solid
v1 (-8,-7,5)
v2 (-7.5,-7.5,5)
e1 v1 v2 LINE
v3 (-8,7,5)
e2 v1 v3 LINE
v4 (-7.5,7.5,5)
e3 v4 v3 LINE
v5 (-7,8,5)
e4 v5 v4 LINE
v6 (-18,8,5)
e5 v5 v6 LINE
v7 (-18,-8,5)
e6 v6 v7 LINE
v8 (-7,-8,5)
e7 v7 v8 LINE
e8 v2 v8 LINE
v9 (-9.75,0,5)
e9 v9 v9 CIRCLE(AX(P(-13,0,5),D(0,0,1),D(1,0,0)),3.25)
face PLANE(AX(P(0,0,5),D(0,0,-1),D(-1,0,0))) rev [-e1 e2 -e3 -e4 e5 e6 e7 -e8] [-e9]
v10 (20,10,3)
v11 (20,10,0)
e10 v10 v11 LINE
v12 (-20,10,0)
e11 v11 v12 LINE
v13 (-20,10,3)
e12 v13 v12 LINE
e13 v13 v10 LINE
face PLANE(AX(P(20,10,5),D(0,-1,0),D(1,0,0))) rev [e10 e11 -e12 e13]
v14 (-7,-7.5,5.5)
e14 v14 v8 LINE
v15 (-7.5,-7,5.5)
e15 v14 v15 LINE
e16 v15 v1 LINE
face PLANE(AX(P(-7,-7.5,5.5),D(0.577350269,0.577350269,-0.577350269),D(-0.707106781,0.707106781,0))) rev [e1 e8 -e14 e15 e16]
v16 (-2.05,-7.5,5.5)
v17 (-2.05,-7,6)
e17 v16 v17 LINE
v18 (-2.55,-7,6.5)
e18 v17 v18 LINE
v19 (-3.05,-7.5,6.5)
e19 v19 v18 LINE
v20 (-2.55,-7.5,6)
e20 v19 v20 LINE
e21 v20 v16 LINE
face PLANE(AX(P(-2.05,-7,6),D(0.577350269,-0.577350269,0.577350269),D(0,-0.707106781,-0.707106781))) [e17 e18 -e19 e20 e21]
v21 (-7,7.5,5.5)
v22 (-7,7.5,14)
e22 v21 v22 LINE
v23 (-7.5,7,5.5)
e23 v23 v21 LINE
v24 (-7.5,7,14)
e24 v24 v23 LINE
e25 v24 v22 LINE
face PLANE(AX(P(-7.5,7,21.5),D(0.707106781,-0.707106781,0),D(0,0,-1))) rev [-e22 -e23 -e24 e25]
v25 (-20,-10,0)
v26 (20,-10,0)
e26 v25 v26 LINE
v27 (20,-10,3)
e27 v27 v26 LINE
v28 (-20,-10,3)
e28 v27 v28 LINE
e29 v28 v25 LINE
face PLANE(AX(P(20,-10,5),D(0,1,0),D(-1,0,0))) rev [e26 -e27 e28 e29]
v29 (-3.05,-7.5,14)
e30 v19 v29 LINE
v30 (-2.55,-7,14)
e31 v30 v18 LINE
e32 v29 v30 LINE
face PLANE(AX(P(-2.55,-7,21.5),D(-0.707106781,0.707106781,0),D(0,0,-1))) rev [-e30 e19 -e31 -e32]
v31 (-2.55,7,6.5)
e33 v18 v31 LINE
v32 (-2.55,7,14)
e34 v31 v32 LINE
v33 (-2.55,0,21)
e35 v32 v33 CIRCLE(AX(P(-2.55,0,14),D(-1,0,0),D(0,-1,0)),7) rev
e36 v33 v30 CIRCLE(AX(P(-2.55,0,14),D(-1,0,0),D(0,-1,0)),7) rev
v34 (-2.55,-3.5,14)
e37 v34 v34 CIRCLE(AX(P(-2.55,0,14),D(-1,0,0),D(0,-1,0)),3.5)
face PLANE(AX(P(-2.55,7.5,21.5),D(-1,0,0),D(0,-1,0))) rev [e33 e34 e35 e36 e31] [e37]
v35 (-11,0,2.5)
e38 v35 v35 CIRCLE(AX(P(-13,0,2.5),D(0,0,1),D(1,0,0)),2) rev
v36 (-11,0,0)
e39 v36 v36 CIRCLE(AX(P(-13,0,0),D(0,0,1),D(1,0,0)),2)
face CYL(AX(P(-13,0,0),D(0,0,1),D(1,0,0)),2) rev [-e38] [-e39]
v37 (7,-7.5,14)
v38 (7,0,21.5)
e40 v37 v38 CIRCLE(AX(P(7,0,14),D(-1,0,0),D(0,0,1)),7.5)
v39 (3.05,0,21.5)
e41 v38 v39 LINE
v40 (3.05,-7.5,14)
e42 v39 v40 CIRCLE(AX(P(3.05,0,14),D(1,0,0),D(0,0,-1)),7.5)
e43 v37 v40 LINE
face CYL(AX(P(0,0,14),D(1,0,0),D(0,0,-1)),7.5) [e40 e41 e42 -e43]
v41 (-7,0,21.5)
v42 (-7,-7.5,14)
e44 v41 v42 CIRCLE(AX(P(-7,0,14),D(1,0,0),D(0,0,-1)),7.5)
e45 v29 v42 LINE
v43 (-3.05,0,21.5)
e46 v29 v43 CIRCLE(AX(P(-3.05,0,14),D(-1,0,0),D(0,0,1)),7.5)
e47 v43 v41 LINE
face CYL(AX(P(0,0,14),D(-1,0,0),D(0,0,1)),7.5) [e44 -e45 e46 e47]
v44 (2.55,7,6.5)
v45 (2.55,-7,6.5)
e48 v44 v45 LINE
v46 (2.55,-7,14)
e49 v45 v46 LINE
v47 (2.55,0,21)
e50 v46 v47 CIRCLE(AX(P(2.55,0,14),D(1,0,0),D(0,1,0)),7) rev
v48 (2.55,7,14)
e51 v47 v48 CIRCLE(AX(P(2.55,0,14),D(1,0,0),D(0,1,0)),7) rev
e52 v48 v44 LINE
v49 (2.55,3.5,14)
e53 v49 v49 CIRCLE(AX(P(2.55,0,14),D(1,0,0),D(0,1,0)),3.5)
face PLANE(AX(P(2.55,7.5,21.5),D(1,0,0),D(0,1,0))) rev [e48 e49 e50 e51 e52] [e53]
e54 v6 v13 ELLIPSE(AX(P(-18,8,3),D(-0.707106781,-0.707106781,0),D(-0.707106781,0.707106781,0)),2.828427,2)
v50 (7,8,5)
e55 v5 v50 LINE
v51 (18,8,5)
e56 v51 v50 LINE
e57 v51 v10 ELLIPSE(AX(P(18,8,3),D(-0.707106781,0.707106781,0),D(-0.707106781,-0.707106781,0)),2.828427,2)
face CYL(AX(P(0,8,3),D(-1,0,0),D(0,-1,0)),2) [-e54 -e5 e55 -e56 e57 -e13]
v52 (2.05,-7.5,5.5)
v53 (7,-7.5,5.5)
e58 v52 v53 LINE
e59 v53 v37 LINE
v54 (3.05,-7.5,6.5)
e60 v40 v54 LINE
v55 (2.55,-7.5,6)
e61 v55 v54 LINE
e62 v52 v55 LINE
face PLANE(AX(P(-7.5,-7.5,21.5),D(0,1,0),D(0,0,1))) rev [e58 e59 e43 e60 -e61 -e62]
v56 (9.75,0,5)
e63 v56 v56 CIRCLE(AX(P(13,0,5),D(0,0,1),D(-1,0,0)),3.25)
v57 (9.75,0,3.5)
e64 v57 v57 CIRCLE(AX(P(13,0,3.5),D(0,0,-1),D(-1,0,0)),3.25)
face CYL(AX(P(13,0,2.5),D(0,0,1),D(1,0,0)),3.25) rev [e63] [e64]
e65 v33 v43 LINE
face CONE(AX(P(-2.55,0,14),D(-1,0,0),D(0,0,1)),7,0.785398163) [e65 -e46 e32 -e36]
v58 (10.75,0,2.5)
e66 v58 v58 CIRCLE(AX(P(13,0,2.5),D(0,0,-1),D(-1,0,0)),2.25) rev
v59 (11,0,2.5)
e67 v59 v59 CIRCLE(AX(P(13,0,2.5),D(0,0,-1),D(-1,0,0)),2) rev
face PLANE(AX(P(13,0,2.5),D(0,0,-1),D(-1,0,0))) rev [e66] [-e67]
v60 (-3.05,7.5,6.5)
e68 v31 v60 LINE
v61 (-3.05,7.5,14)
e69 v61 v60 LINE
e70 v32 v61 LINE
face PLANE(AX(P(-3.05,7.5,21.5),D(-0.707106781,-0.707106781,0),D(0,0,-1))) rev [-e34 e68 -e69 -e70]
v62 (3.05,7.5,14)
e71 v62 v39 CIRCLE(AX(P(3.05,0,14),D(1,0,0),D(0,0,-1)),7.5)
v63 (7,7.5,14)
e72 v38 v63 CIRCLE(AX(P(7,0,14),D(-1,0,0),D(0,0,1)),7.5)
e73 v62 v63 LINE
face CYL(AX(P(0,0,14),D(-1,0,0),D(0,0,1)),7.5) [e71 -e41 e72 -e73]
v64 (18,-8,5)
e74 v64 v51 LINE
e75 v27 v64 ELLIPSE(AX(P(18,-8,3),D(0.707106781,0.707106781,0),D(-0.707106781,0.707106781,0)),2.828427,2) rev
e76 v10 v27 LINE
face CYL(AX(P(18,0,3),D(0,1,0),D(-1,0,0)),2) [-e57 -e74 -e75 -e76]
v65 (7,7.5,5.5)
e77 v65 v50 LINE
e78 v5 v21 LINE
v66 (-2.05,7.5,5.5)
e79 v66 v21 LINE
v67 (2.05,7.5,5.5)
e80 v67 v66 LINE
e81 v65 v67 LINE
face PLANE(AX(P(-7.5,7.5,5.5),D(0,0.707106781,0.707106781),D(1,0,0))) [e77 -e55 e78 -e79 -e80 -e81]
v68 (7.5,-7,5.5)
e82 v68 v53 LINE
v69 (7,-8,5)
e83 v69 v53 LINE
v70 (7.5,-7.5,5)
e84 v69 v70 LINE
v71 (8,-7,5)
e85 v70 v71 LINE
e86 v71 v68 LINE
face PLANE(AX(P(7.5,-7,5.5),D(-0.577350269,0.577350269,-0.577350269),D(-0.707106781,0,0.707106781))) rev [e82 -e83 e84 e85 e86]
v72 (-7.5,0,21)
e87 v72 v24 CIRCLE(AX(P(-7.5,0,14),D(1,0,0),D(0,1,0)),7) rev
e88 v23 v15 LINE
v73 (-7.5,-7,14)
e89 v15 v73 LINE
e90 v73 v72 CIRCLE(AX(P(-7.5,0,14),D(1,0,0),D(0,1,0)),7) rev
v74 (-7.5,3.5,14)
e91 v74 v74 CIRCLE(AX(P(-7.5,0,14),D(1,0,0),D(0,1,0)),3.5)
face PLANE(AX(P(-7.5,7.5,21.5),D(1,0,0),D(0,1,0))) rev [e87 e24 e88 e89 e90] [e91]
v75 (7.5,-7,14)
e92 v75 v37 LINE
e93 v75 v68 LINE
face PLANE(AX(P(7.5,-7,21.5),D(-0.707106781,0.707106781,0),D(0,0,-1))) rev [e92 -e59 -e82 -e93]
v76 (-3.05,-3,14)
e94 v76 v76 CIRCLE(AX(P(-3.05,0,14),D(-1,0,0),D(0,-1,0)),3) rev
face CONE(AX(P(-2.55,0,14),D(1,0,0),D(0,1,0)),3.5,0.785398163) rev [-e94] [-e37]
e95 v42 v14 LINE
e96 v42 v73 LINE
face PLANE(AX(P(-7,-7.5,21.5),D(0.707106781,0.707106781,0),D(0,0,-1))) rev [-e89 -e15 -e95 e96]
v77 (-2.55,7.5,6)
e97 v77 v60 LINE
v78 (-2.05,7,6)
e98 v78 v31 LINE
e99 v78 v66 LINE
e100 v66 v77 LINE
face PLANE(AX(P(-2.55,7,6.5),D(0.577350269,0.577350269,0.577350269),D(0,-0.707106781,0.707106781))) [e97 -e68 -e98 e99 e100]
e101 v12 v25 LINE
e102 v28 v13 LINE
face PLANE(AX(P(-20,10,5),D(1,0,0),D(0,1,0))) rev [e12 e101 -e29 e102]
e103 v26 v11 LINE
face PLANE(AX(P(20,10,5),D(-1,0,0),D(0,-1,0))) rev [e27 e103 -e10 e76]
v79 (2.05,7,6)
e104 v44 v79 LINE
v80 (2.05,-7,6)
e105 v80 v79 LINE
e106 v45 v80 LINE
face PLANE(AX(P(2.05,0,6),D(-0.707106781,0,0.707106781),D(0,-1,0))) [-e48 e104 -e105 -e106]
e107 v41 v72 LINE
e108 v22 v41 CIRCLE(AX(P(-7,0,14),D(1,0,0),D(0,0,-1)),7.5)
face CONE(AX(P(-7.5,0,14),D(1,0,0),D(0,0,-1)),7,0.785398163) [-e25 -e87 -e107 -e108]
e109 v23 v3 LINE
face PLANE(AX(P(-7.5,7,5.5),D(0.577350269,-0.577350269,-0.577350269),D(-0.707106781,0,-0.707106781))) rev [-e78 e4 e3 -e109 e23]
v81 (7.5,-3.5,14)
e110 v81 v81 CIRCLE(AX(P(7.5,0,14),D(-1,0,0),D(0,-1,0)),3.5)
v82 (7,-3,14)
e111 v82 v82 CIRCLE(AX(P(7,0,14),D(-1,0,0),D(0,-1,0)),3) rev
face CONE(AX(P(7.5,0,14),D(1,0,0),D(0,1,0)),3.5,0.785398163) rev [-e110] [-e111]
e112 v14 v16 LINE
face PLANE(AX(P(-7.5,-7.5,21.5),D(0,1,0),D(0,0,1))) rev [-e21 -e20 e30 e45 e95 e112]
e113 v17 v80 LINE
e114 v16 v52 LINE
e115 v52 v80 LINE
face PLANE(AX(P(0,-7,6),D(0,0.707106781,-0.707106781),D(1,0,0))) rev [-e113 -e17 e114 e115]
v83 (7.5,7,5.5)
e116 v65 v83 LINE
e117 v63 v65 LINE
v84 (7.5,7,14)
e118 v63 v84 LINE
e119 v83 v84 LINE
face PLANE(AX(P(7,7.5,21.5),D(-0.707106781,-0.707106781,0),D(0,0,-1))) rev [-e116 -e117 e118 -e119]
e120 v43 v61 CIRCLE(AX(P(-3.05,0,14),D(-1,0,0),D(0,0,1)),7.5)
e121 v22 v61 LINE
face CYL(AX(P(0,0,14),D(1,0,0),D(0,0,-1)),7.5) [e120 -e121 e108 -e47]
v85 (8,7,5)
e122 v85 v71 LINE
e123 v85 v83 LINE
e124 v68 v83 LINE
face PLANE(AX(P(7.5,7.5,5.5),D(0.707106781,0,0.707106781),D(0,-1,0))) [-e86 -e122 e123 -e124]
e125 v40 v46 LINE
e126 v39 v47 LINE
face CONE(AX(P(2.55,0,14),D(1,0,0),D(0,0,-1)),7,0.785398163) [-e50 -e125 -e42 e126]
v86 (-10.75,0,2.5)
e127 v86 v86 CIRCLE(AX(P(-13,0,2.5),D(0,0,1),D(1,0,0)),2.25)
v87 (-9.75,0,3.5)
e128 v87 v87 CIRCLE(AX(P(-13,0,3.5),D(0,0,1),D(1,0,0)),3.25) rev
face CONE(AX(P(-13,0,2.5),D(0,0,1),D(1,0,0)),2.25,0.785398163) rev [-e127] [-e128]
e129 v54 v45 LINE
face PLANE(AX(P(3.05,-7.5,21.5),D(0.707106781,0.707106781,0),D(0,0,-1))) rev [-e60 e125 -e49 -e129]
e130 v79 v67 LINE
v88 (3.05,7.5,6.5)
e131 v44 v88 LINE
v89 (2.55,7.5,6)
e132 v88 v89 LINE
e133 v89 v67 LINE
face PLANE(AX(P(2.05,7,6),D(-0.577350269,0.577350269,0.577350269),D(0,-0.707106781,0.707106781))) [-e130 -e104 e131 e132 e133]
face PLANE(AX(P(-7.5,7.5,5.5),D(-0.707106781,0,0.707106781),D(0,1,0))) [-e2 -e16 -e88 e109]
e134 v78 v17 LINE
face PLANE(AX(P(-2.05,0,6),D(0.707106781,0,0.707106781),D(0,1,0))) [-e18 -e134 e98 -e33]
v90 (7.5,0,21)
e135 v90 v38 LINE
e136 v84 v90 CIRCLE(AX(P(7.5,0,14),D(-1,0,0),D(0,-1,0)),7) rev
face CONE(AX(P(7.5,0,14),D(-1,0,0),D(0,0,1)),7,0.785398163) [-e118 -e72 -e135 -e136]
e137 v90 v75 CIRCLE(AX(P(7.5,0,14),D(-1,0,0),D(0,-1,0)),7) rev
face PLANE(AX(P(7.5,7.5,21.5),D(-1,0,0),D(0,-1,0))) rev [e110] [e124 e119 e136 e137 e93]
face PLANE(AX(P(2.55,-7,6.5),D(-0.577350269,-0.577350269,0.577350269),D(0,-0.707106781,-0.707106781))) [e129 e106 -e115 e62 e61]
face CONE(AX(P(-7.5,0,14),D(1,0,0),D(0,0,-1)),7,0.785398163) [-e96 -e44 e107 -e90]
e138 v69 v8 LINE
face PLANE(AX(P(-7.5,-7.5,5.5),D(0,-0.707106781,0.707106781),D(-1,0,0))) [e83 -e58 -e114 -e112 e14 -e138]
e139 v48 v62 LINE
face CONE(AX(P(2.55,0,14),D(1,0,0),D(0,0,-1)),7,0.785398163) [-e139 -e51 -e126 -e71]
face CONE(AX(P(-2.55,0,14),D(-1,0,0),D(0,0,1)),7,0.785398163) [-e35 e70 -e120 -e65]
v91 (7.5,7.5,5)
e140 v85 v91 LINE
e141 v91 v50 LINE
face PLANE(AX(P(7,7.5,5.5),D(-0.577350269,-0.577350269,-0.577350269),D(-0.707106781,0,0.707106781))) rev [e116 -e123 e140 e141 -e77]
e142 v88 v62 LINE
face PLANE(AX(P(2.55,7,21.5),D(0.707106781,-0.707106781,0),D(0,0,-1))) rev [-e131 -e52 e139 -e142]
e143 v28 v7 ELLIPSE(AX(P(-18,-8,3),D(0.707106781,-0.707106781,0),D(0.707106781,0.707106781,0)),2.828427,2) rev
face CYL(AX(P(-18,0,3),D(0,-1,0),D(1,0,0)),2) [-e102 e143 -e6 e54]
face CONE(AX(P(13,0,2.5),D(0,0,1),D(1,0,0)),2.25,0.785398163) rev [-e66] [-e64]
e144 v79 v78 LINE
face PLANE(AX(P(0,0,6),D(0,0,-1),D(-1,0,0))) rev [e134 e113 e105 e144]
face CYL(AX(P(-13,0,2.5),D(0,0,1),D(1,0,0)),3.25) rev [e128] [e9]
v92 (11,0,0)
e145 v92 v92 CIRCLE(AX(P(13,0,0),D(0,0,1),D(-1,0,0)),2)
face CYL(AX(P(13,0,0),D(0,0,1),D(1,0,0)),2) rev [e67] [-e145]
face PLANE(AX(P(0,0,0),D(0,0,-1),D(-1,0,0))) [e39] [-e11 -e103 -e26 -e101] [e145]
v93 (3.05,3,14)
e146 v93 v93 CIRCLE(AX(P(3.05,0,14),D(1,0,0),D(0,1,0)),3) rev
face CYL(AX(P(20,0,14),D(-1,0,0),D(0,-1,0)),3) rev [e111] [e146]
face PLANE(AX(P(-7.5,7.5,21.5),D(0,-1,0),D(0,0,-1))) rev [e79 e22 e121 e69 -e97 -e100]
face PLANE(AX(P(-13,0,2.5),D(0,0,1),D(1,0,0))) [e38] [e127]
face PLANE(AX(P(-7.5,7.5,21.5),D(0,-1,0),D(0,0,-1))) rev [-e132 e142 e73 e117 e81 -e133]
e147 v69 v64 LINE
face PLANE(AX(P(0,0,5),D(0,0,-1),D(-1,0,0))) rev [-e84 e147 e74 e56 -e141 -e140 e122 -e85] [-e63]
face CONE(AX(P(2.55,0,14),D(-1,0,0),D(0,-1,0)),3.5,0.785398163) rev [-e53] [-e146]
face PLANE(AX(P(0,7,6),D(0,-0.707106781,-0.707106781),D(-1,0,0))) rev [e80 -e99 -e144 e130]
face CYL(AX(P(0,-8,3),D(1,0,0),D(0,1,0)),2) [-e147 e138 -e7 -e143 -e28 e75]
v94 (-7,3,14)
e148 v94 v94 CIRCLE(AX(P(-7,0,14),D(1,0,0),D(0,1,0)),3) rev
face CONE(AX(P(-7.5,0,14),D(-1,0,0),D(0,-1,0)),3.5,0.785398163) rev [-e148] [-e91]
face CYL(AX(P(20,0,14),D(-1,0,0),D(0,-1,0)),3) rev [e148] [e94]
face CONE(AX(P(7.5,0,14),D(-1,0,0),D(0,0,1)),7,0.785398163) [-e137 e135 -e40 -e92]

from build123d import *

# Parameters (mm, degrees)
SKETCH1_W               = 40
SKETCH1_H               = 20
BOSS_EXTRUDE1_DEPTH     = 5
SKETCH2_W               = 4.95
SKETCH2_H               = 15
BOSS_EXTRUDE2_DEPTH     = 16.5
CUT_EXTRUDE1_DEPTH      = 37.311155311
CUT_EXTRUDE1_DEPTH_BACK = 37.311155311
SKETCH3_R               = 3
FILLET1_R               = 7.5
SKETCH4_W               = 5.1
SKETCH4_H               = 15
BOSS_EXTRUDE3_DEPTH     = 1
CHAMFER1_SIZE           = 0.5
FILLET2_R               = 2
CUT_EXTRUDE2_DEPTH      = 28.789386463
CUT_EXTRUDE2_DEPTH_BACK = 28.789386463
SKETCH5_R               = 2
SKETCH7_R               = 3.25
CUT_EXTRUDE3_DEPTH      = 2.5
CHAMFER2_SIZE           = 1


with BuildPart() as part:
    # Sketch1 → Boss-Extrude1 (new body)
    with BuildSketch(Plane.XY):
        Rectangle(SKETCH1_W, SKETCH1_H)
    extrude(amount=BOSS_EXTRUDE1_DEPTH)

    # Sketch2 → Boss-Extrude2 (add)
    with BuildSketch(Plane.XY.offset(5)):
        with Locations((-5.025, 0)):
            Rectangle(SKETCH2_W, SKETCH2_H)
        with Locations((5.025, 0)):
            Rectangle(SKETCH2_W, SKETCH2_H)
    extrude(amount=BOSS_EXTRUDE2_DEPTH)

    # Sketch3 → Cut-Extrude1 (cut, two sides: drawn at the far end of the back side and taken through both)
    with BuildSketch(Plane.ZY.offset(7.5).offset(-CUT_EXTRUDE1_DEPTH_BACK)):
        with Locations(Location((14, 0, 0), (0, 0, 270))):
            Circle(SKETCH3_R)
    extrude(amount=CUT_EXTRUDE1_DEPTH + CUT_EXTRUDE1_DEPTH_BACK, mode=Mode.SUBTRACT)

    # Fillet1
    fillet1_edges = [part.edges().sort_by_distance(p)[0] for p in [
        (5.025, -7.5, 21.5),
        (5.025, 7.5, 21.5),
        (-5.025, -7.5, 21.5),
        (-5.025, 7.5, 21.5),
    ]]
    fillet(fillet1_edges, radius=FILLET1_R - 0.0001)  # a hair under: the kernel refuses the full size

    # Sketch4 → Boss-Extrude3 (add)
    with BuildSketch(Plane.XY.offset(5)):
        Rectangle(SKETCH4_W, SKETCH4_H)
    extrude(amount=BOSS_EXTRUDE3_DEPTH)

    # Chamfer1
    chamfer1_edges = [part.edges().sort_by_distance(p)[0] for p in [
        (0, 7.5, 5),
        (-7.5, 0, 5),
        (0, -7.5, 5),
        (7.5, 0, 5),
        (-7.5, 3, 14),
        (-2.55, 3, 14),
        (2.55, 3, 14),
        (7.5, 3, 14),
        (7.5, 7.5, 9.50005),
        (7.5, -7.5, 9.50005),
        (7.5, 5.303330148, 19.303330148),
        (7.5, -5.303330148, 19.303330148),
        (2.55, -7.5, 10.00005),
        (2.55, 7.5, 10.00005),
        (2.55, 5.303330148, 19.303330148),
        (2.55, -5.303330148, 19.303330148),
        (-2.55, 7.5, 10.00005),
        (-2.55, -7.5, 10.00005),
        (-2.55, 5.303330148, 19.303330148),
        (-2.55, -5.303330148, 19.303330148),
        (-7.5, -7.5, 9.50005),
        (-7.5, 7.5, 9.50005),
        (-7.5, 5.303330148, 19.303330148),
        (-7.5, -5.303330148, 19.303330148),
        (2.55, 0, 6),
        (0, 7.5, 6),
        (-2.55, 0, 6),
        (0, -7.5, 6),
    ]]
    chamfer(chamfer1_edges, length=CHAMFER1_SIZE - 0.0001)  # a hair under: the kernel refuses the full size

    # Fillet2
    fillet2_edges = [part.edges().sort_by_distance(p)[0] for p in [
        (20, 0, 5),
        (0, 10, 5),
        (-20, 0, 5),
        (0, -10, 5),
    ]]
    fillet(fillet2_edges, radius=FILLET2_R)

    # Sketch5 → Cut-Extrude2 (cut, two sides: drawn at the far end of the back side and taken through both)
    with BuildSketch(Plane.XY.offset(5).offset(-CUT_EXTRUDE2_DEPTH_BACK)):
        with Locations((-13, 0)):
            Circle(SKETCH5_R)
        with Locations(Location((13, 0, 0), (0, 0, 180))):
            Circle(SKETCH5_R)
    extrude(amount=CUT_EXTRUDE2_DEPTH + CUT_EXTRUDE2_DEPTH_BACK, mode=Mode.SUBTRACT)

    # Sketch7 → Cut-Extrude3 (cut)
    with BuildSketch(Plane.XY.offset(5)):
        with Locations((-13, 0)):
            Circle(SKETCH7_R)
        with Locations(Location((13, 0, 0), (0, 0, 180))):
            Circle(SKETCH7_R)
    extrude(amount=-CUT_EXTRUDE3_DEPTH, mode=Mode.SUBTRACT)

    # Chamfer2
    chamfer2_edges = [part.edges().sort_by_distance(p)[0] for p in [
        (-16.25, 0, 2.5),
        (16.25, 0, 2.5),
    ]]
    chamfer(chamfer2_edges, length=CHAMFER2_SIZE)


solid = part.part
